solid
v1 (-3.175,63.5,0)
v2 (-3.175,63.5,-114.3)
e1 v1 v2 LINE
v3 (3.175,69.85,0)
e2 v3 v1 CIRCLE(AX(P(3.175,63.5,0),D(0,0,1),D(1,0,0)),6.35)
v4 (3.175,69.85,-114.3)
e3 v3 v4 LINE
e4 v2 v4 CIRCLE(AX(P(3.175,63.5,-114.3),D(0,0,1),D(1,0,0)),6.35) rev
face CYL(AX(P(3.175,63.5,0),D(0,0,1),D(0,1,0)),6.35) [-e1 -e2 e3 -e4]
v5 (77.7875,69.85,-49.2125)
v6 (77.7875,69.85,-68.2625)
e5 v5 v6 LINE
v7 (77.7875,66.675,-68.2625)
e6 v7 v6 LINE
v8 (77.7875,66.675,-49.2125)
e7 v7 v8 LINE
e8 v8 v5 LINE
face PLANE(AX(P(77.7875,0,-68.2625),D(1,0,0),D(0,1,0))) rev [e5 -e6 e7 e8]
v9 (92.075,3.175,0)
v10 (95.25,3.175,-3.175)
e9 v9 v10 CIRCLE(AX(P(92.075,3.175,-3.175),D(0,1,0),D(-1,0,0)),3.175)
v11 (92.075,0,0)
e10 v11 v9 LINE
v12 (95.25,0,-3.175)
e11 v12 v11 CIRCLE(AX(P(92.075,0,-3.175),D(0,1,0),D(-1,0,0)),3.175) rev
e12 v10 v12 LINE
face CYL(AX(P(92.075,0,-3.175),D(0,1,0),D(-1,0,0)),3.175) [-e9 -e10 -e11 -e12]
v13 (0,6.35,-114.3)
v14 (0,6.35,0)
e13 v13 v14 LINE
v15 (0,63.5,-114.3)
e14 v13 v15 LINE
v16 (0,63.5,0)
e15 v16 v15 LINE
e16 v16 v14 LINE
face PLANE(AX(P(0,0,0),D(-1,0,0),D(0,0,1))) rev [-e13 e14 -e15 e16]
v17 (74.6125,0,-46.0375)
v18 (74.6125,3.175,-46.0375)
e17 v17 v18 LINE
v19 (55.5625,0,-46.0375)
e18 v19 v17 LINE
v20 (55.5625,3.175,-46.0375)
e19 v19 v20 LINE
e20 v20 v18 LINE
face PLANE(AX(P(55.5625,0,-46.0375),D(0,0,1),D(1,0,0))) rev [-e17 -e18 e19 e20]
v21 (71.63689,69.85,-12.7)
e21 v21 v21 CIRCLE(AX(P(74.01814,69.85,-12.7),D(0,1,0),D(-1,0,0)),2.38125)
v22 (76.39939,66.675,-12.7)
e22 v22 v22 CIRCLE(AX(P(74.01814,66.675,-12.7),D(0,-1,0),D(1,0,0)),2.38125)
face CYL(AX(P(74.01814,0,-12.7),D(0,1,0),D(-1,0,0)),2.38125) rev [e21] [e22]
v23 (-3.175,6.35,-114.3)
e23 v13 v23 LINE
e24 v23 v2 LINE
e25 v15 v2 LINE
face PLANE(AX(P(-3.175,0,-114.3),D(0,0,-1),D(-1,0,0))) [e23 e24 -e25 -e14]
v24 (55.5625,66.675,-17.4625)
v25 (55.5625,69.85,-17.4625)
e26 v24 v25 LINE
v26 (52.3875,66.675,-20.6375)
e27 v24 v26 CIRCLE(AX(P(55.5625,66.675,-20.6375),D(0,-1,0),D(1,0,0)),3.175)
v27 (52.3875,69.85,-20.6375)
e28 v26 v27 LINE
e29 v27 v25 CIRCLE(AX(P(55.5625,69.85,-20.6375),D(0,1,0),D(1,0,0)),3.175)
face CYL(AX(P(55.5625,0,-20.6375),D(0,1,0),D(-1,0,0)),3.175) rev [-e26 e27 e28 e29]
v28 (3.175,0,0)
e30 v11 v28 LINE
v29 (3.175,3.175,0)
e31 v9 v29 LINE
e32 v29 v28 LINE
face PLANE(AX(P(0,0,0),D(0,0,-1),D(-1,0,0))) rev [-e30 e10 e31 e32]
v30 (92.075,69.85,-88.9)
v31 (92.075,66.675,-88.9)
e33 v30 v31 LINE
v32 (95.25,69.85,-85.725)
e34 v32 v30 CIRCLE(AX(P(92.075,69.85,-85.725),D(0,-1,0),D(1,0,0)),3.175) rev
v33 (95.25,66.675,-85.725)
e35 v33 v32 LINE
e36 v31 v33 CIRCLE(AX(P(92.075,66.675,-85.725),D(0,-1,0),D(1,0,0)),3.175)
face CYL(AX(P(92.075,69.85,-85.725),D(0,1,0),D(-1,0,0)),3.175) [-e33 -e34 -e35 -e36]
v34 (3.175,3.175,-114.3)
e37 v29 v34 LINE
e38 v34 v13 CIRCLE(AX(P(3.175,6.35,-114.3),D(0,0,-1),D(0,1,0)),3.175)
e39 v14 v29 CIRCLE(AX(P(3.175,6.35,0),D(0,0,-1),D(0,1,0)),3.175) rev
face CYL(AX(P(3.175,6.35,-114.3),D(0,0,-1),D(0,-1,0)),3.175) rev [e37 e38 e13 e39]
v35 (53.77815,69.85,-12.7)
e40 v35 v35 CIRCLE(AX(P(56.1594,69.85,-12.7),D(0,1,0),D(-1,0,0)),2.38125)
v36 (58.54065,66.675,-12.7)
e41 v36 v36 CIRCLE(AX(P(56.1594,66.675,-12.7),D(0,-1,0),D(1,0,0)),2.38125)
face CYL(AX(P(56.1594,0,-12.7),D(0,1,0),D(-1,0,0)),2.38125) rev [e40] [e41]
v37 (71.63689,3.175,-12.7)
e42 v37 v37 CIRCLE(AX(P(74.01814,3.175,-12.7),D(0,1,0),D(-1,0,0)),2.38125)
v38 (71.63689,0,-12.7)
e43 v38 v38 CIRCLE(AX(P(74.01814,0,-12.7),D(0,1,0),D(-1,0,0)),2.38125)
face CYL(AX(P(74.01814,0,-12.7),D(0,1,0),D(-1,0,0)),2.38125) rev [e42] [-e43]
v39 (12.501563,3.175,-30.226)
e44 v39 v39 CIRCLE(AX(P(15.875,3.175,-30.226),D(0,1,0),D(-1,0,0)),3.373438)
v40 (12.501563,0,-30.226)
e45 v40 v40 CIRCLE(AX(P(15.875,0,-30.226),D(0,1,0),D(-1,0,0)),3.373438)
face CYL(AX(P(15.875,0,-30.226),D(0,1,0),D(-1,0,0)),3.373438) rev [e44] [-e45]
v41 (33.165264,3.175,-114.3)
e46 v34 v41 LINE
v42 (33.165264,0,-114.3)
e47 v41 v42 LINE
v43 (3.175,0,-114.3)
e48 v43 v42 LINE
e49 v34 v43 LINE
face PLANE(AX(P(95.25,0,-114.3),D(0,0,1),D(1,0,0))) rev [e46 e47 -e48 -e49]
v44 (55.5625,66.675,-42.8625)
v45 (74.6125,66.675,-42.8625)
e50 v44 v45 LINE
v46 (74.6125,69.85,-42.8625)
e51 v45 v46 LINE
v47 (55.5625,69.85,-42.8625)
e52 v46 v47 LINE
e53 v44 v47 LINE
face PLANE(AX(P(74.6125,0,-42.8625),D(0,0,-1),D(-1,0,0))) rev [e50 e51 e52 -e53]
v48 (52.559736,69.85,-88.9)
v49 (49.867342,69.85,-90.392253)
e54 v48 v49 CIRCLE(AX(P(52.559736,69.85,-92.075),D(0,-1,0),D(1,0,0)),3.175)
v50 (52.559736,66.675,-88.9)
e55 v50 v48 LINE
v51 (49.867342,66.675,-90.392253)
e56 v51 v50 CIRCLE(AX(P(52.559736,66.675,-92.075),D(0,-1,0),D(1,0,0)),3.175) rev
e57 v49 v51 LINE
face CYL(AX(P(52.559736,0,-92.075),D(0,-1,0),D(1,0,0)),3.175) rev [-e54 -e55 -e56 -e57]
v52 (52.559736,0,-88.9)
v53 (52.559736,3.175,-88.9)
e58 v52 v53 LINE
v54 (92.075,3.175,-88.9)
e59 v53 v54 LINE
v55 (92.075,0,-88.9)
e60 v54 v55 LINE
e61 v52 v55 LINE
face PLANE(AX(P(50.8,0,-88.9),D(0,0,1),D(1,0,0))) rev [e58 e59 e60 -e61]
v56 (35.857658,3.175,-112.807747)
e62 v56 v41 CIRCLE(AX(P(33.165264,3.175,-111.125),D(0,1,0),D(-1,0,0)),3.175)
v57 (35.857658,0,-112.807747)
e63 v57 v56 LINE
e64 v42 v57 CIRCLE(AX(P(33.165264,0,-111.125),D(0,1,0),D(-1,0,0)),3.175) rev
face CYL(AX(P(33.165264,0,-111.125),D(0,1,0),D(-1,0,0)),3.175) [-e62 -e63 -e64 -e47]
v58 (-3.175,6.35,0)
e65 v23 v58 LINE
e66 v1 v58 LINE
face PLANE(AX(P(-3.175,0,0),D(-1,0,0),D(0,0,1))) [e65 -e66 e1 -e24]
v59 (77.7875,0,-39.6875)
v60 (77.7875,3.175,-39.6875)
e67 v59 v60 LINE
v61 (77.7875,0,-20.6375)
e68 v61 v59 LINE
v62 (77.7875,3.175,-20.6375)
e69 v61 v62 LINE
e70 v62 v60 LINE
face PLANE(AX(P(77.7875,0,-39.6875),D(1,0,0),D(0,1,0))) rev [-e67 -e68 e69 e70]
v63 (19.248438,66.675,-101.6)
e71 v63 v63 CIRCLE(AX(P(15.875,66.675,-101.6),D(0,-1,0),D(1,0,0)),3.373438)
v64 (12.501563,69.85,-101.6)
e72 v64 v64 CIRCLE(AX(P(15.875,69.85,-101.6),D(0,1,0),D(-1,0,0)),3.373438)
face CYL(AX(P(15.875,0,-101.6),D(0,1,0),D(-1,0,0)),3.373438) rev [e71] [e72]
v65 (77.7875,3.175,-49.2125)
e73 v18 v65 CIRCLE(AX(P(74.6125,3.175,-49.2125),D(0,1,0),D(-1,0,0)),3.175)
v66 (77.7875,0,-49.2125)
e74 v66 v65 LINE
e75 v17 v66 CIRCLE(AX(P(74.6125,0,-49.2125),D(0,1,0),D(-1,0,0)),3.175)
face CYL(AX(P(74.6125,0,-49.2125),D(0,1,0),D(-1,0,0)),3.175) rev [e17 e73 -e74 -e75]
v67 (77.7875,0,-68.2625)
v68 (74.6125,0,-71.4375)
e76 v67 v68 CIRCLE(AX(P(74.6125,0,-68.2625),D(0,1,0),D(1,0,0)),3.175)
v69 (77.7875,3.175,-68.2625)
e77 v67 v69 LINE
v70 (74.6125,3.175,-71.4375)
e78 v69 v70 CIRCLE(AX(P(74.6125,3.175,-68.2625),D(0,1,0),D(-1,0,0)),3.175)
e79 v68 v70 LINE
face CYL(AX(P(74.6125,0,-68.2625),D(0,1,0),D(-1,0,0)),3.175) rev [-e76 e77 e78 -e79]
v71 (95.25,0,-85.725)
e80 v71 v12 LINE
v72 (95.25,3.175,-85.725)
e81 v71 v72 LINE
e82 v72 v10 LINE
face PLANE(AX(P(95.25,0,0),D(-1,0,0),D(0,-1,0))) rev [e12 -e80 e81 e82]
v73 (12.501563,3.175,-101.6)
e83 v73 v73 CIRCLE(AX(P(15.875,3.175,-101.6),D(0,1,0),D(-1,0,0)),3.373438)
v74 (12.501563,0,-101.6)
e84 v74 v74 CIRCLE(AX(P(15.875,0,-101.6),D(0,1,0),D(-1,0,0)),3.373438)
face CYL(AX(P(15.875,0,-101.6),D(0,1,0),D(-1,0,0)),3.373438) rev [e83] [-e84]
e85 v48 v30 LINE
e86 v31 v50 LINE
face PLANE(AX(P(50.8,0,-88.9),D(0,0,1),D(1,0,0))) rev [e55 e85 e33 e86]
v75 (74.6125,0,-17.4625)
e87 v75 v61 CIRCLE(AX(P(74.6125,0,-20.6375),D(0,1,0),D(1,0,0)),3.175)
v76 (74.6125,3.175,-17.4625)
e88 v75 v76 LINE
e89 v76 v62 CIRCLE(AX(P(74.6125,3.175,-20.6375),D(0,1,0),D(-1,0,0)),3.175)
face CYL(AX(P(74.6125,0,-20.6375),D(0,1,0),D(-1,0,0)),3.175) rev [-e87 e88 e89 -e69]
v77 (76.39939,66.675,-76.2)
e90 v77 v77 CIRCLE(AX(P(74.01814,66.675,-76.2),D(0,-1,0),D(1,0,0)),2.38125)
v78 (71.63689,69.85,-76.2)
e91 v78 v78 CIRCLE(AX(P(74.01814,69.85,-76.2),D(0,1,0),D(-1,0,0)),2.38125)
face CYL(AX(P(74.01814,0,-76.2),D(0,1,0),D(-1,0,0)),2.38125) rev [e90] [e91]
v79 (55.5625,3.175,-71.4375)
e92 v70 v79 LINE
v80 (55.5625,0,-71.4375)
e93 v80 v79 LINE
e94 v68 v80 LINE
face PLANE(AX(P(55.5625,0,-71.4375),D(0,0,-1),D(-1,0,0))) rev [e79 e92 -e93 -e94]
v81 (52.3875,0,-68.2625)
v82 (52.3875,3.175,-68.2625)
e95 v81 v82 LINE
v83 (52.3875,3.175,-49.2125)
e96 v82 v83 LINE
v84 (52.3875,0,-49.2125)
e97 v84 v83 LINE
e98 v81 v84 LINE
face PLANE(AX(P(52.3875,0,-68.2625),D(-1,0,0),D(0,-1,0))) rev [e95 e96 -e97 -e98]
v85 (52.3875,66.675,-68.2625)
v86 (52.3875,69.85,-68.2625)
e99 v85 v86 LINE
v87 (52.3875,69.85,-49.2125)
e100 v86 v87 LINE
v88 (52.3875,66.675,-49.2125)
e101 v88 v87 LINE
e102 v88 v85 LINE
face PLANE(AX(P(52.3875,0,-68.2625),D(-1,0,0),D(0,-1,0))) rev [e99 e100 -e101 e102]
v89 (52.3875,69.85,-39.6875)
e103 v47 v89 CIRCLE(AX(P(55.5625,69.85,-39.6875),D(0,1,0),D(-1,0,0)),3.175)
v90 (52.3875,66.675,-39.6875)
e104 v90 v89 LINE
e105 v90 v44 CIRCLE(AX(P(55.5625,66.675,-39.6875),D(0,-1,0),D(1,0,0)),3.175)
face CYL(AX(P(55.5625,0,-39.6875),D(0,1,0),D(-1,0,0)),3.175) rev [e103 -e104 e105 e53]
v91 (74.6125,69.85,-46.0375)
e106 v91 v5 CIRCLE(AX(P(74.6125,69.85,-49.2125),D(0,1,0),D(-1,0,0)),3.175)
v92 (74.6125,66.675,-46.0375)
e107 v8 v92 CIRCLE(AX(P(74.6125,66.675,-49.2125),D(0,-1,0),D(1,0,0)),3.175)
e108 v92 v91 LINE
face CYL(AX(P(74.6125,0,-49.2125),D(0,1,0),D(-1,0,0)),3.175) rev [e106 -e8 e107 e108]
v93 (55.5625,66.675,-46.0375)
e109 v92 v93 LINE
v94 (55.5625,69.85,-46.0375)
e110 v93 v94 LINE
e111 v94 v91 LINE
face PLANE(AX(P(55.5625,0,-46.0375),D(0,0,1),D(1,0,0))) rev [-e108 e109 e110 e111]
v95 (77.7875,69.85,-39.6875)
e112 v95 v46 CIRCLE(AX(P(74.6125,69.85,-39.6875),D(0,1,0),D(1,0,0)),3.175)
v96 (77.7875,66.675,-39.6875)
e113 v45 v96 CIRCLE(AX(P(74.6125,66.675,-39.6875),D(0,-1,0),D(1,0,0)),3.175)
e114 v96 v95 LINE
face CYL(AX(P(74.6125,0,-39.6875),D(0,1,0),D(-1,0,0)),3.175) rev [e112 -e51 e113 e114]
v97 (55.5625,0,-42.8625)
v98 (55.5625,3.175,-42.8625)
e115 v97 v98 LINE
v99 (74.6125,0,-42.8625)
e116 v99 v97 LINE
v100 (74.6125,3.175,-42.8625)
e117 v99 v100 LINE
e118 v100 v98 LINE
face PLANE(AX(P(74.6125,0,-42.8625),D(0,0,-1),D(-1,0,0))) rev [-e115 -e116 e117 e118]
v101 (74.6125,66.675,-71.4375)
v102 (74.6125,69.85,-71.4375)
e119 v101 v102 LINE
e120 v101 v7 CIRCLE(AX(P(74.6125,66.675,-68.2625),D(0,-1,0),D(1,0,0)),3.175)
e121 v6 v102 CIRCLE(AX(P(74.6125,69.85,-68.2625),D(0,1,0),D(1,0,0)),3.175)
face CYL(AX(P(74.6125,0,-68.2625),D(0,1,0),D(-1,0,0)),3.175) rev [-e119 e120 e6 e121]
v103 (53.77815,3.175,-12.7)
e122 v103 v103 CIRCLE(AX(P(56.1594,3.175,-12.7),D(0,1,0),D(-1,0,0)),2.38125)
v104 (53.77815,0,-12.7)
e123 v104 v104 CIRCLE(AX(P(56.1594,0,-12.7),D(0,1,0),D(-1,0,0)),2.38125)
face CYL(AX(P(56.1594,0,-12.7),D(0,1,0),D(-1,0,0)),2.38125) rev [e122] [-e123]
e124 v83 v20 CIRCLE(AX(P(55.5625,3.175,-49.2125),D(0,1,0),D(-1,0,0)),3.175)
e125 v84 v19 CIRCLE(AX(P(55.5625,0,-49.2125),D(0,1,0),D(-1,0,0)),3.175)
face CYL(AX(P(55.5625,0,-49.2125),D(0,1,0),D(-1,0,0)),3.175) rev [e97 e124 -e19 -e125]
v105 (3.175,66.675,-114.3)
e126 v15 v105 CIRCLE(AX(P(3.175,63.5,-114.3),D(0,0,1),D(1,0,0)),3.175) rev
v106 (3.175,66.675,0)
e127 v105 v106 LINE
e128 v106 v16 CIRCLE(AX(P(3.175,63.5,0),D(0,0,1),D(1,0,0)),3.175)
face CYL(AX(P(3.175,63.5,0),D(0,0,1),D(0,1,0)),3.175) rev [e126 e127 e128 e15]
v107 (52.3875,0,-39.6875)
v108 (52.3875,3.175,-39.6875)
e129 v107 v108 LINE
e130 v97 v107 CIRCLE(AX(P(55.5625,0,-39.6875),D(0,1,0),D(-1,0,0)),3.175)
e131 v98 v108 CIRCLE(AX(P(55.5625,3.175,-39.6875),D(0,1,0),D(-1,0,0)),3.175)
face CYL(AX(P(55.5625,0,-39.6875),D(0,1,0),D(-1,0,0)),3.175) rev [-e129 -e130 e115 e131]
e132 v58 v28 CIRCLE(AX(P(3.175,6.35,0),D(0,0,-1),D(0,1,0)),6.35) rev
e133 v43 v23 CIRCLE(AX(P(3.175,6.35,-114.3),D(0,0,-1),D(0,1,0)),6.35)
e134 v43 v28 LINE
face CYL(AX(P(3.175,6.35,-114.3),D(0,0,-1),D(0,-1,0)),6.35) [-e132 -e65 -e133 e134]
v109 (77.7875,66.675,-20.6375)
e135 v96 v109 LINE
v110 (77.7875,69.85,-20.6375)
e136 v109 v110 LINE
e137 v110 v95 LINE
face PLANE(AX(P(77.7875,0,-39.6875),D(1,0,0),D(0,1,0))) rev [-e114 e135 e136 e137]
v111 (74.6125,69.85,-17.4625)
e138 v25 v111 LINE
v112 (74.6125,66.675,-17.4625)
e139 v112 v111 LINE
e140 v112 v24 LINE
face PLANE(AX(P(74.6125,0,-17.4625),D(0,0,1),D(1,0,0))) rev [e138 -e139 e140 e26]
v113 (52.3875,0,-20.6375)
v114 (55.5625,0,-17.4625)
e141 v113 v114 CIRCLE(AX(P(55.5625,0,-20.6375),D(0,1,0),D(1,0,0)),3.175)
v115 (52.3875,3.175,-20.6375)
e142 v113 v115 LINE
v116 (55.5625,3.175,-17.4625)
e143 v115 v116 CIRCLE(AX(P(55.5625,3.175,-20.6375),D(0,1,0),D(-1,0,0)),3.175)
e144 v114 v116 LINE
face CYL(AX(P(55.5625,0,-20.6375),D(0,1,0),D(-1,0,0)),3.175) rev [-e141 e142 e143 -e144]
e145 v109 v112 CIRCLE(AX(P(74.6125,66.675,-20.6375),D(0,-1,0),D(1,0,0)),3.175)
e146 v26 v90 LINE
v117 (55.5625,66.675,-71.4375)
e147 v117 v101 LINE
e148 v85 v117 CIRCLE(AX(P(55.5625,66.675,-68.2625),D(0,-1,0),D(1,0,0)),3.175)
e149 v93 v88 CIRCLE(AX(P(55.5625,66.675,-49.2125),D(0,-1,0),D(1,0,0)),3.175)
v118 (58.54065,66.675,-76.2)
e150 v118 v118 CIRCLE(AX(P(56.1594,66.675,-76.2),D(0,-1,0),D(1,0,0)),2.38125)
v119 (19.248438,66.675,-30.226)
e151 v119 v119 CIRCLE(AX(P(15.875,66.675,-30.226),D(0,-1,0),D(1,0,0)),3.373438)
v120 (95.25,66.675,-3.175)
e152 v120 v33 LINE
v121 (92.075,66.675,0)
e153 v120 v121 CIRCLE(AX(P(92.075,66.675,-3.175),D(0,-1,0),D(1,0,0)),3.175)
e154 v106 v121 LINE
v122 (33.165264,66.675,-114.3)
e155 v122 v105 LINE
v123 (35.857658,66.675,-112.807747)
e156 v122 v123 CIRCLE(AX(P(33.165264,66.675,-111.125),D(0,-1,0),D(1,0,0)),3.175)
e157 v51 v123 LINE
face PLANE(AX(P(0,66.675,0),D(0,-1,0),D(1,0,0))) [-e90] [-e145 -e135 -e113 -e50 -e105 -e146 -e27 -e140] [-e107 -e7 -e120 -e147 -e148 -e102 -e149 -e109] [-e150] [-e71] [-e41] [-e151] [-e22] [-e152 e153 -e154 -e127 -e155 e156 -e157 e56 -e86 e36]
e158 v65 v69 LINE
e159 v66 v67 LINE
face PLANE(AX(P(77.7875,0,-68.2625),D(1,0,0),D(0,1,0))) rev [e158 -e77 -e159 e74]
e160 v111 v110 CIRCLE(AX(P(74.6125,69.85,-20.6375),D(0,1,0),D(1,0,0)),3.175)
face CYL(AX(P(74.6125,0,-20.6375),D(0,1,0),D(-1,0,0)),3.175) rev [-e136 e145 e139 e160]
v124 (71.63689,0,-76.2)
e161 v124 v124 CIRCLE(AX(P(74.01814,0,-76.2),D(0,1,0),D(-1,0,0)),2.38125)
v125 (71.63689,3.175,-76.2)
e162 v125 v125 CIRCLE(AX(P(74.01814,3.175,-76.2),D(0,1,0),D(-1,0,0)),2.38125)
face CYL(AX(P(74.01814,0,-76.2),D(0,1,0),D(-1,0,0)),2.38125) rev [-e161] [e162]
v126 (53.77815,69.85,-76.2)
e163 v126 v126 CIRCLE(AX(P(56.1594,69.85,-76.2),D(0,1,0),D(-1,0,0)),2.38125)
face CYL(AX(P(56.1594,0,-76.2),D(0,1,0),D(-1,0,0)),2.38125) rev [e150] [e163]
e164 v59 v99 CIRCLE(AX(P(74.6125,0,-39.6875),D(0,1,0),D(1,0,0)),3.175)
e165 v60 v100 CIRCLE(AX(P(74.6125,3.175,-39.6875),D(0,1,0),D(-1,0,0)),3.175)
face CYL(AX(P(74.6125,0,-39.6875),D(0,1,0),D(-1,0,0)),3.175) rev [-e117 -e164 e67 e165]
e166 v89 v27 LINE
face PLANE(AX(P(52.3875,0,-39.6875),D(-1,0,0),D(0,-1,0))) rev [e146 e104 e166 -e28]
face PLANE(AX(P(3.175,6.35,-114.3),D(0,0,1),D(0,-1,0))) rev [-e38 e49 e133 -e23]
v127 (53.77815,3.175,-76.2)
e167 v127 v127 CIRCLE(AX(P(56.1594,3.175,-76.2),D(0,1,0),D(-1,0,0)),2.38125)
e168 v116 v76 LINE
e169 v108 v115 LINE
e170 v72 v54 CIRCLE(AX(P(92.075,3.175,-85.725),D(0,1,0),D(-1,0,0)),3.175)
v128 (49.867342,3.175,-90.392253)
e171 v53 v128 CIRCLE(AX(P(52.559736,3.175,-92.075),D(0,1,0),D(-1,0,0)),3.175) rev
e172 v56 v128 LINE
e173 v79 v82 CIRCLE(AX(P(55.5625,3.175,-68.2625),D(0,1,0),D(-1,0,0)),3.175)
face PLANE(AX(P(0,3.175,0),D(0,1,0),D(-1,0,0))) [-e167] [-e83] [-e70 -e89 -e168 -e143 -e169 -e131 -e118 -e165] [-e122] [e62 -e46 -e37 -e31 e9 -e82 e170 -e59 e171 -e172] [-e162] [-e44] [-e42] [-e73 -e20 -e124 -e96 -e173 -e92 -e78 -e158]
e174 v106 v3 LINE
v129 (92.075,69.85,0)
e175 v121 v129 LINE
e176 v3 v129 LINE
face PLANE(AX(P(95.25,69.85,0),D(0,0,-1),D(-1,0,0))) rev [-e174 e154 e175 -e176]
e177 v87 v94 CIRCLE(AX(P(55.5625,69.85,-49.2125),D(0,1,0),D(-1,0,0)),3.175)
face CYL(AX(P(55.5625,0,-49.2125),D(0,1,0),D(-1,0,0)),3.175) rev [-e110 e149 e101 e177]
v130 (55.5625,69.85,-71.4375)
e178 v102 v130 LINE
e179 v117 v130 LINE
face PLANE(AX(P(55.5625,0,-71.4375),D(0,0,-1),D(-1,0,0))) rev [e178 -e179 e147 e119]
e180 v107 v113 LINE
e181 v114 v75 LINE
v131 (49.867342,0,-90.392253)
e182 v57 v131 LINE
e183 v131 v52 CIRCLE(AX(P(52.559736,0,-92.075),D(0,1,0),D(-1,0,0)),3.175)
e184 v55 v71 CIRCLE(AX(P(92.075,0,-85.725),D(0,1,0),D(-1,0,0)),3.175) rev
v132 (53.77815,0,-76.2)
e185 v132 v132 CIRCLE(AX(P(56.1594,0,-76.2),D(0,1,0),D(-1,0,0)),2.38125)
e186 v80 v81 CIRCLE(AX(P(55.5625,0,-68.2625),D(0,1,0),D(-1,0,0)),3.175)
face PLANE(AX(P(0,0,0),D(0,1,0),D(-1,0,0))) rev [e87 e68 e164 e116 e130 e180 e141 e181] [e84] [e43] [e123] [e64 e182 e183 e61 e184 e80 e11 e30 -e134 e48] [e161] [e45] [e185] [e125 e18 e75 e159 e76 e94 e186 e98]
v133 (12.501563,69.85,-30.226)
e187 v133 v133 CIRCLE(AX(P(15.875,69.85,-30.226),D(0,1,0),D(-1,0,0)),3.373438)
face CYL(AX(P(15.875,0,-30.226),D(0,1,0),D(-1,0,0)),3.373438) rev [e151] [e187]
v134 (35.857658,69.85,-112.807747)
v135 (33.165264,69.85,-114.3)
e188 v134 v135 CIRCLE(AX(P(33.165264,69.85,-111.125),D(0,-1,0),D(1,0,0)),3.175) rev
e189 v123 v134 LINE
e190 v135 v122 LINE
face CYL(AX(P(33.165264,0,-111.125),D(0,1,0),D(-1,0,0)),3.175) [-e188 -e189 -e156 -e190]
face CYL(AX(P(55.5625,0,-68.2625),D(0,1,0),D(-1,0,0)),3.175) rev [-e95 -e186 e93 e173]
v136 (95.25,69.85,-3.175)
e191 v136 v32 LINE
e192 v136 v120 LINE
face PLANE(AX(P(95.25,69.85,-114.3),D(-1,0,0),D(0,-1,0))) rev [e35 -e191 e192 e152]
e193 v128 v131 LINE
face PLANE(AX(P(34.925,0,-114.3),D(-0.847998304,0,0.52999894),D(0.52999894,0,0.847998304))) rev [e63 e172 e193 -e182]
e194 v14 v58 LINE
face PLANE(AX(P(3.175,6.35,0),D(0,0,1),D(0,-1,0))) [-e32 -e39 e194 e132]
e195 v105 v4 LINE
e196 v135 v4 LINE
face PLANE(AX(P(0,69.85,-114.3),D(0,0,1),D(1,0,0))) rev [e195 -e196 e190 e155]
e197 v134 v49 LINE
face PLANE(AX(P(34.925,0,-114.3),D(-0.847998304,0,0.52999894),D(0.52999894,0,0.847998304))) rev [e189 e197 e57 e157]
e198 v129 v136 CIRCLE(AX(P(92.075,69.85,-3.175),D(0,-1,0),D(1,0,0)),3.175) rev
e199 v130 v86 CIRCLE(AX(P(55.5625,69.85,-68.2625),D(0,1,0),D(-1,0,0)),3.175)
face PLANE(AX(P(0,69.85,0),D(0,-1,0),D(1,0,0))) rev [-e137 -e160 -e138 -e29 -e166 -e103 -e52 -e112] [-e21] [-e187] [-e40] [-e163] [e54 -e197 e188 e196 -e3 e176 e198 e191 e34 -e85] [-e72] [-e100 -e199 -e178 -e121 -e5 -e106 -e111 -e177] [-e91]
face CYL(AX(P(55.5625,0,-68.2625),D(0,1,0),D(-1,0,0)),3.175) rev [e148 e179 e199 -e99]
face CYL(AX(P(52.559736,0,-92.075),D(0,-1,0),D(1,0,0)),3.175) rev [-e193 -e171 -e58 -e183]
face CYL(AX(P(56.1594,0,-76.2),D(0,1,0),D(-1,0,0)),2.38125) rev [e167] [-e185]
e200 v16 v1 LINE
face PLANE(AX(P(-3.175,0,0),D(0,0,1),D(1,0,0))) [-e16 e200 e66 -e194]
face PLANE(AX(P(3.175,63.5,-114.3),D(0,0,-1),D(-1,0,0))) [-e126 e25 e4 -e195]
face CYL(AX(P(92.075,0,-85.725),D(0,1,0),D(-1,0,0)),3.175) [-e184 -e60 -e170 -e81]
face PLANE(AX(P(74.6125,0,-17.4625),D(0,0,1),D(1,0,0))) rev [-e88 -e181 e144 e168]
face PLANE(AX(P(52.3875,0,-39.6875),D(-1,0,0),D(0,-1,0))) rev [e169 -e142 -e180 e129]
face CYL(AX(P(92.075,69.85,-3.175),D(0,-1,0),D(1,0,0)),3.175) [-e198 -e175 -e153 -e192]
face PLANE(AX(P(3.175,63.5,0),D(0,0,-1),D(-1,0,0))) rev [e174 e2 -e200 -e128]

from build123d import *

# Parameters (mm, degrees)
SKETCH1_W                      = 114.3
SKETCH1_H                      = 69.85
BASE_FLANGE1_DEPTH             = 3.175
EDGE_FLANGE1_STRIP_W           = 19.05
EDGE_FLANGE1_STRIP_H           = 3.175
EDGE_FLANGE1_STRIP_CUT_DEPTH   = 114.3
EDGE_FLANGE1_STRIP_2_W         = 19.05
EDGE_FLANGE1_STRIP_2_H         = 3.175
EDGE_FLANGE1_STRIP_CUT_2_DEPTH = 114.3
EDGE_FLANGE1_DEPTH             = 114.3
EDGE_FLANGE1_BEND_DEPTH        = 114.3
SKETCH12_R                     = 2.38125
SKETCH12_R_2                   = 3.3734375
CUT_EXTRUDE1_DEPTH             = 165.36567464
FILLET1_R                      = 3.175


# Sheet-metal steps are written as plain solids
with BuildPart() as part:
    # Sketch1 → Base-Flange1 (new body)
    with BuildSketch(Plane(origin=(0, 0, 0), x_dir=(0, 0, -1), z_dir=(1, 0, 0))):
        with Locations((57.15, 34.925)):
            Rectangle(SKETCH1_W, SKETCH1_H)
    extrude(amount=-BASE_FLANGE1_DEPTH)

    # Edge-Flange1 strip (across the edge) → Edge-Flange1 strip cut (cut)
    with BuildSketch(Plane(origin=(0, 69.85, -114.3), x_dir=(0, -1, 0), z_dir=(0, 0, 1))):
        with Locations((-3.175, -1.5875)):
            Rectangle(EDGE_FLANGE1_STRIP_W, EDGE_FLANGE1_STRIP_H)
    extrude(amount=EDGE_FLANGE1_STRIP_CUT_DEPTH, mode=Mode.SUBTRACT)

    # Edge-Flange1 strip 2 (across the edge) → Edge-Flange1 strip cut 2 (cut)
    with BuildSketch(Plane.YX):
        with Locations((-3.175, -1.5875)):
            Rectangle(EDGE_FLANGE1_STRIP_2_W, EDGE_FLANGE1_STRIP_2_H)
    extrude(amount=EDGE_FLANGE1_STRIP_CUT_2_DEPTH, mode=Mode.SUBTRACT)

    # Edge-Flange1 section (across the edge) → Edge-Flange1 (add)
    with BuildSketch(Plane(origin=(0, 69.85, -114.3), x_dir=(0, -1, 0), z_dir=(0, 0, 1))):
        with BuildLine():
            Line((0, 3.175), (0, 95.25))
            Line((0, 95.25), (3.175, 95.25))
            Line((3.175, 95.25), (3.175, 3.175))
            ThreePointArc((3.175, 3.175), (4.10493597, 0.92993597), (6.35, 0))
            Line((6.35, 0), (6.35, -3.175))
            ThreePointArc((6.35, -3.175), (1.859871939, -1.315128061), (0, 3.175))
        make_face()
    extrude(amount=EDGE_FLANGE1_DEPTH)

    # Edge-Flange1 section 2 (across the edge) → Edge-Flange1 bend (add)
    with BuildSketch(Plane.YX):
        with BuildLine():
            Line((0, 3.175), (0, 95.25))
            Line((0, 95.25), (3.175, 95.25))
            Line((3.175, 95.25), (3.175, 3.175))
            ThreePointArc((3.175, 3.175), (4.10493597, 0.92993597), (6.35, 0))
            Line((6.35, 0), (6.35, -3.175))
            ThreePointArc((6.35, -3.175), (1.859871939, -1.315128061), (0, 3.175))
        make_face()
    extrude(amount=EDGE_FLANGE1_BEND_DEPTH)

    # Sketch12 → Cut-Extrude1 (cut, through all)
    with BuildSketch(Plane(origin=(0, 69.85, 0), x_dir=(1, 0, 0), z_dir=(0, 1, 0))):
        with Locations(Location((56.1594, 76.2, 0), (0, 0, 180))):
            Circle(SKETCH12_R)
        with Locations(Location((74.01814, 76.2, 0), (0, 0, 180))):
            Circle(SKETCH12_R)
        with Locations(Location((56.1594, 12.7, 0), (0, 0, 180))):
            Circle(SKETCH12_R)
        with Locations(Location((74.01814, 12.7, 0), (0, 0, 180))):
            Circle(SKETCH12_R)
        with Locations(Location((15.875, 101.6, 0), (0, 0, 180))):
            Circle(SKETCH12_R_2)
        with Locations(Location((15.875, 30.226, 0), (0, 0, 180))):
            Circle(SKETCH12_R_2)
        Polygon((34.925, 114.3), (50.8, 88.9), (95.25, 88.9), (95.25, 114.3), align=None)
        with BuildLine():
            Line((55.5625, 71.4375), (74.6125, 71.4375))
            ThreePointArc((74.6125, 71.4375), (76.85756403, 70.50756403), (77.7875, 68.2625))
            Line((77.7875, 68.2625), (77.7875, 49.2125))
            ThreePointArc((77.7875, 49.2125), (76.85756403, 46.96743597), (74.6125, 46.0375))
            Line((74.6125, 46.0375), (55.5625, 46.0375))
            ThreePointArc((55.5625, 46.0375), (53.31743597, 46.96743597), (52.3875, 49.2125))
            Line((52.3875, 49.2125), (52.3875, 68.2625))
            ThreePointArc((52.3875, 68.2625), (53.31743597, 70.50756403), (55.5625, 71.4375))
        make_face()
        with BuildLine():
            Line((74.6125, 42.8625), (55.5625, 42.8625))
            ThreePointArc((55.5625, 42.8625), (53.31743597, 41.93256403), (52.3875, 39.6875))
            Line((52.3875, 39.6875), (52.3875, 20.6375))
            ThreePointArc((52.3875, 20.6375), (53.31743597, 18.39243597), (55.5625, 17.4625))
            Line((55.5625, 17.4625), (74.6125, 17.4625))
            ThreePointArc((74.6125, 17.4625), (76.85756403, 18.39243597), (77.7875, 20.6375))
            Line((77.7875, 20.6375), (77.7875, 39.6875))
            ThreePointArc((77.7875, 39.6875), (76.85756403, 41.93256403), (74.6125, 42.8625))
        make_face()
    extrude(amount=-CUT_EXTRUDE1_DEPTH, mode=Mode.SUBTRACT)

    # Fillet1
    fillet1_edges = [part.edges().sort_by_distance(p)[0] for p in [
        (50.8, 68.2625, -88.9),
        (34.925, 68.2625, -114.3),
        (95.25, 68.2625, -88.9),
        (34.925, 1.5875, -114.3),
        (95.25, 1.5875, -88.9),
        (50.8, 1.5875, -88.9),
        (95.25, 68.2625, 0),
        (95.25, 1.5875, 0),
    ]]
    fillet(fillet1_edges, radius=FILLET1_R)


solid = part.part
